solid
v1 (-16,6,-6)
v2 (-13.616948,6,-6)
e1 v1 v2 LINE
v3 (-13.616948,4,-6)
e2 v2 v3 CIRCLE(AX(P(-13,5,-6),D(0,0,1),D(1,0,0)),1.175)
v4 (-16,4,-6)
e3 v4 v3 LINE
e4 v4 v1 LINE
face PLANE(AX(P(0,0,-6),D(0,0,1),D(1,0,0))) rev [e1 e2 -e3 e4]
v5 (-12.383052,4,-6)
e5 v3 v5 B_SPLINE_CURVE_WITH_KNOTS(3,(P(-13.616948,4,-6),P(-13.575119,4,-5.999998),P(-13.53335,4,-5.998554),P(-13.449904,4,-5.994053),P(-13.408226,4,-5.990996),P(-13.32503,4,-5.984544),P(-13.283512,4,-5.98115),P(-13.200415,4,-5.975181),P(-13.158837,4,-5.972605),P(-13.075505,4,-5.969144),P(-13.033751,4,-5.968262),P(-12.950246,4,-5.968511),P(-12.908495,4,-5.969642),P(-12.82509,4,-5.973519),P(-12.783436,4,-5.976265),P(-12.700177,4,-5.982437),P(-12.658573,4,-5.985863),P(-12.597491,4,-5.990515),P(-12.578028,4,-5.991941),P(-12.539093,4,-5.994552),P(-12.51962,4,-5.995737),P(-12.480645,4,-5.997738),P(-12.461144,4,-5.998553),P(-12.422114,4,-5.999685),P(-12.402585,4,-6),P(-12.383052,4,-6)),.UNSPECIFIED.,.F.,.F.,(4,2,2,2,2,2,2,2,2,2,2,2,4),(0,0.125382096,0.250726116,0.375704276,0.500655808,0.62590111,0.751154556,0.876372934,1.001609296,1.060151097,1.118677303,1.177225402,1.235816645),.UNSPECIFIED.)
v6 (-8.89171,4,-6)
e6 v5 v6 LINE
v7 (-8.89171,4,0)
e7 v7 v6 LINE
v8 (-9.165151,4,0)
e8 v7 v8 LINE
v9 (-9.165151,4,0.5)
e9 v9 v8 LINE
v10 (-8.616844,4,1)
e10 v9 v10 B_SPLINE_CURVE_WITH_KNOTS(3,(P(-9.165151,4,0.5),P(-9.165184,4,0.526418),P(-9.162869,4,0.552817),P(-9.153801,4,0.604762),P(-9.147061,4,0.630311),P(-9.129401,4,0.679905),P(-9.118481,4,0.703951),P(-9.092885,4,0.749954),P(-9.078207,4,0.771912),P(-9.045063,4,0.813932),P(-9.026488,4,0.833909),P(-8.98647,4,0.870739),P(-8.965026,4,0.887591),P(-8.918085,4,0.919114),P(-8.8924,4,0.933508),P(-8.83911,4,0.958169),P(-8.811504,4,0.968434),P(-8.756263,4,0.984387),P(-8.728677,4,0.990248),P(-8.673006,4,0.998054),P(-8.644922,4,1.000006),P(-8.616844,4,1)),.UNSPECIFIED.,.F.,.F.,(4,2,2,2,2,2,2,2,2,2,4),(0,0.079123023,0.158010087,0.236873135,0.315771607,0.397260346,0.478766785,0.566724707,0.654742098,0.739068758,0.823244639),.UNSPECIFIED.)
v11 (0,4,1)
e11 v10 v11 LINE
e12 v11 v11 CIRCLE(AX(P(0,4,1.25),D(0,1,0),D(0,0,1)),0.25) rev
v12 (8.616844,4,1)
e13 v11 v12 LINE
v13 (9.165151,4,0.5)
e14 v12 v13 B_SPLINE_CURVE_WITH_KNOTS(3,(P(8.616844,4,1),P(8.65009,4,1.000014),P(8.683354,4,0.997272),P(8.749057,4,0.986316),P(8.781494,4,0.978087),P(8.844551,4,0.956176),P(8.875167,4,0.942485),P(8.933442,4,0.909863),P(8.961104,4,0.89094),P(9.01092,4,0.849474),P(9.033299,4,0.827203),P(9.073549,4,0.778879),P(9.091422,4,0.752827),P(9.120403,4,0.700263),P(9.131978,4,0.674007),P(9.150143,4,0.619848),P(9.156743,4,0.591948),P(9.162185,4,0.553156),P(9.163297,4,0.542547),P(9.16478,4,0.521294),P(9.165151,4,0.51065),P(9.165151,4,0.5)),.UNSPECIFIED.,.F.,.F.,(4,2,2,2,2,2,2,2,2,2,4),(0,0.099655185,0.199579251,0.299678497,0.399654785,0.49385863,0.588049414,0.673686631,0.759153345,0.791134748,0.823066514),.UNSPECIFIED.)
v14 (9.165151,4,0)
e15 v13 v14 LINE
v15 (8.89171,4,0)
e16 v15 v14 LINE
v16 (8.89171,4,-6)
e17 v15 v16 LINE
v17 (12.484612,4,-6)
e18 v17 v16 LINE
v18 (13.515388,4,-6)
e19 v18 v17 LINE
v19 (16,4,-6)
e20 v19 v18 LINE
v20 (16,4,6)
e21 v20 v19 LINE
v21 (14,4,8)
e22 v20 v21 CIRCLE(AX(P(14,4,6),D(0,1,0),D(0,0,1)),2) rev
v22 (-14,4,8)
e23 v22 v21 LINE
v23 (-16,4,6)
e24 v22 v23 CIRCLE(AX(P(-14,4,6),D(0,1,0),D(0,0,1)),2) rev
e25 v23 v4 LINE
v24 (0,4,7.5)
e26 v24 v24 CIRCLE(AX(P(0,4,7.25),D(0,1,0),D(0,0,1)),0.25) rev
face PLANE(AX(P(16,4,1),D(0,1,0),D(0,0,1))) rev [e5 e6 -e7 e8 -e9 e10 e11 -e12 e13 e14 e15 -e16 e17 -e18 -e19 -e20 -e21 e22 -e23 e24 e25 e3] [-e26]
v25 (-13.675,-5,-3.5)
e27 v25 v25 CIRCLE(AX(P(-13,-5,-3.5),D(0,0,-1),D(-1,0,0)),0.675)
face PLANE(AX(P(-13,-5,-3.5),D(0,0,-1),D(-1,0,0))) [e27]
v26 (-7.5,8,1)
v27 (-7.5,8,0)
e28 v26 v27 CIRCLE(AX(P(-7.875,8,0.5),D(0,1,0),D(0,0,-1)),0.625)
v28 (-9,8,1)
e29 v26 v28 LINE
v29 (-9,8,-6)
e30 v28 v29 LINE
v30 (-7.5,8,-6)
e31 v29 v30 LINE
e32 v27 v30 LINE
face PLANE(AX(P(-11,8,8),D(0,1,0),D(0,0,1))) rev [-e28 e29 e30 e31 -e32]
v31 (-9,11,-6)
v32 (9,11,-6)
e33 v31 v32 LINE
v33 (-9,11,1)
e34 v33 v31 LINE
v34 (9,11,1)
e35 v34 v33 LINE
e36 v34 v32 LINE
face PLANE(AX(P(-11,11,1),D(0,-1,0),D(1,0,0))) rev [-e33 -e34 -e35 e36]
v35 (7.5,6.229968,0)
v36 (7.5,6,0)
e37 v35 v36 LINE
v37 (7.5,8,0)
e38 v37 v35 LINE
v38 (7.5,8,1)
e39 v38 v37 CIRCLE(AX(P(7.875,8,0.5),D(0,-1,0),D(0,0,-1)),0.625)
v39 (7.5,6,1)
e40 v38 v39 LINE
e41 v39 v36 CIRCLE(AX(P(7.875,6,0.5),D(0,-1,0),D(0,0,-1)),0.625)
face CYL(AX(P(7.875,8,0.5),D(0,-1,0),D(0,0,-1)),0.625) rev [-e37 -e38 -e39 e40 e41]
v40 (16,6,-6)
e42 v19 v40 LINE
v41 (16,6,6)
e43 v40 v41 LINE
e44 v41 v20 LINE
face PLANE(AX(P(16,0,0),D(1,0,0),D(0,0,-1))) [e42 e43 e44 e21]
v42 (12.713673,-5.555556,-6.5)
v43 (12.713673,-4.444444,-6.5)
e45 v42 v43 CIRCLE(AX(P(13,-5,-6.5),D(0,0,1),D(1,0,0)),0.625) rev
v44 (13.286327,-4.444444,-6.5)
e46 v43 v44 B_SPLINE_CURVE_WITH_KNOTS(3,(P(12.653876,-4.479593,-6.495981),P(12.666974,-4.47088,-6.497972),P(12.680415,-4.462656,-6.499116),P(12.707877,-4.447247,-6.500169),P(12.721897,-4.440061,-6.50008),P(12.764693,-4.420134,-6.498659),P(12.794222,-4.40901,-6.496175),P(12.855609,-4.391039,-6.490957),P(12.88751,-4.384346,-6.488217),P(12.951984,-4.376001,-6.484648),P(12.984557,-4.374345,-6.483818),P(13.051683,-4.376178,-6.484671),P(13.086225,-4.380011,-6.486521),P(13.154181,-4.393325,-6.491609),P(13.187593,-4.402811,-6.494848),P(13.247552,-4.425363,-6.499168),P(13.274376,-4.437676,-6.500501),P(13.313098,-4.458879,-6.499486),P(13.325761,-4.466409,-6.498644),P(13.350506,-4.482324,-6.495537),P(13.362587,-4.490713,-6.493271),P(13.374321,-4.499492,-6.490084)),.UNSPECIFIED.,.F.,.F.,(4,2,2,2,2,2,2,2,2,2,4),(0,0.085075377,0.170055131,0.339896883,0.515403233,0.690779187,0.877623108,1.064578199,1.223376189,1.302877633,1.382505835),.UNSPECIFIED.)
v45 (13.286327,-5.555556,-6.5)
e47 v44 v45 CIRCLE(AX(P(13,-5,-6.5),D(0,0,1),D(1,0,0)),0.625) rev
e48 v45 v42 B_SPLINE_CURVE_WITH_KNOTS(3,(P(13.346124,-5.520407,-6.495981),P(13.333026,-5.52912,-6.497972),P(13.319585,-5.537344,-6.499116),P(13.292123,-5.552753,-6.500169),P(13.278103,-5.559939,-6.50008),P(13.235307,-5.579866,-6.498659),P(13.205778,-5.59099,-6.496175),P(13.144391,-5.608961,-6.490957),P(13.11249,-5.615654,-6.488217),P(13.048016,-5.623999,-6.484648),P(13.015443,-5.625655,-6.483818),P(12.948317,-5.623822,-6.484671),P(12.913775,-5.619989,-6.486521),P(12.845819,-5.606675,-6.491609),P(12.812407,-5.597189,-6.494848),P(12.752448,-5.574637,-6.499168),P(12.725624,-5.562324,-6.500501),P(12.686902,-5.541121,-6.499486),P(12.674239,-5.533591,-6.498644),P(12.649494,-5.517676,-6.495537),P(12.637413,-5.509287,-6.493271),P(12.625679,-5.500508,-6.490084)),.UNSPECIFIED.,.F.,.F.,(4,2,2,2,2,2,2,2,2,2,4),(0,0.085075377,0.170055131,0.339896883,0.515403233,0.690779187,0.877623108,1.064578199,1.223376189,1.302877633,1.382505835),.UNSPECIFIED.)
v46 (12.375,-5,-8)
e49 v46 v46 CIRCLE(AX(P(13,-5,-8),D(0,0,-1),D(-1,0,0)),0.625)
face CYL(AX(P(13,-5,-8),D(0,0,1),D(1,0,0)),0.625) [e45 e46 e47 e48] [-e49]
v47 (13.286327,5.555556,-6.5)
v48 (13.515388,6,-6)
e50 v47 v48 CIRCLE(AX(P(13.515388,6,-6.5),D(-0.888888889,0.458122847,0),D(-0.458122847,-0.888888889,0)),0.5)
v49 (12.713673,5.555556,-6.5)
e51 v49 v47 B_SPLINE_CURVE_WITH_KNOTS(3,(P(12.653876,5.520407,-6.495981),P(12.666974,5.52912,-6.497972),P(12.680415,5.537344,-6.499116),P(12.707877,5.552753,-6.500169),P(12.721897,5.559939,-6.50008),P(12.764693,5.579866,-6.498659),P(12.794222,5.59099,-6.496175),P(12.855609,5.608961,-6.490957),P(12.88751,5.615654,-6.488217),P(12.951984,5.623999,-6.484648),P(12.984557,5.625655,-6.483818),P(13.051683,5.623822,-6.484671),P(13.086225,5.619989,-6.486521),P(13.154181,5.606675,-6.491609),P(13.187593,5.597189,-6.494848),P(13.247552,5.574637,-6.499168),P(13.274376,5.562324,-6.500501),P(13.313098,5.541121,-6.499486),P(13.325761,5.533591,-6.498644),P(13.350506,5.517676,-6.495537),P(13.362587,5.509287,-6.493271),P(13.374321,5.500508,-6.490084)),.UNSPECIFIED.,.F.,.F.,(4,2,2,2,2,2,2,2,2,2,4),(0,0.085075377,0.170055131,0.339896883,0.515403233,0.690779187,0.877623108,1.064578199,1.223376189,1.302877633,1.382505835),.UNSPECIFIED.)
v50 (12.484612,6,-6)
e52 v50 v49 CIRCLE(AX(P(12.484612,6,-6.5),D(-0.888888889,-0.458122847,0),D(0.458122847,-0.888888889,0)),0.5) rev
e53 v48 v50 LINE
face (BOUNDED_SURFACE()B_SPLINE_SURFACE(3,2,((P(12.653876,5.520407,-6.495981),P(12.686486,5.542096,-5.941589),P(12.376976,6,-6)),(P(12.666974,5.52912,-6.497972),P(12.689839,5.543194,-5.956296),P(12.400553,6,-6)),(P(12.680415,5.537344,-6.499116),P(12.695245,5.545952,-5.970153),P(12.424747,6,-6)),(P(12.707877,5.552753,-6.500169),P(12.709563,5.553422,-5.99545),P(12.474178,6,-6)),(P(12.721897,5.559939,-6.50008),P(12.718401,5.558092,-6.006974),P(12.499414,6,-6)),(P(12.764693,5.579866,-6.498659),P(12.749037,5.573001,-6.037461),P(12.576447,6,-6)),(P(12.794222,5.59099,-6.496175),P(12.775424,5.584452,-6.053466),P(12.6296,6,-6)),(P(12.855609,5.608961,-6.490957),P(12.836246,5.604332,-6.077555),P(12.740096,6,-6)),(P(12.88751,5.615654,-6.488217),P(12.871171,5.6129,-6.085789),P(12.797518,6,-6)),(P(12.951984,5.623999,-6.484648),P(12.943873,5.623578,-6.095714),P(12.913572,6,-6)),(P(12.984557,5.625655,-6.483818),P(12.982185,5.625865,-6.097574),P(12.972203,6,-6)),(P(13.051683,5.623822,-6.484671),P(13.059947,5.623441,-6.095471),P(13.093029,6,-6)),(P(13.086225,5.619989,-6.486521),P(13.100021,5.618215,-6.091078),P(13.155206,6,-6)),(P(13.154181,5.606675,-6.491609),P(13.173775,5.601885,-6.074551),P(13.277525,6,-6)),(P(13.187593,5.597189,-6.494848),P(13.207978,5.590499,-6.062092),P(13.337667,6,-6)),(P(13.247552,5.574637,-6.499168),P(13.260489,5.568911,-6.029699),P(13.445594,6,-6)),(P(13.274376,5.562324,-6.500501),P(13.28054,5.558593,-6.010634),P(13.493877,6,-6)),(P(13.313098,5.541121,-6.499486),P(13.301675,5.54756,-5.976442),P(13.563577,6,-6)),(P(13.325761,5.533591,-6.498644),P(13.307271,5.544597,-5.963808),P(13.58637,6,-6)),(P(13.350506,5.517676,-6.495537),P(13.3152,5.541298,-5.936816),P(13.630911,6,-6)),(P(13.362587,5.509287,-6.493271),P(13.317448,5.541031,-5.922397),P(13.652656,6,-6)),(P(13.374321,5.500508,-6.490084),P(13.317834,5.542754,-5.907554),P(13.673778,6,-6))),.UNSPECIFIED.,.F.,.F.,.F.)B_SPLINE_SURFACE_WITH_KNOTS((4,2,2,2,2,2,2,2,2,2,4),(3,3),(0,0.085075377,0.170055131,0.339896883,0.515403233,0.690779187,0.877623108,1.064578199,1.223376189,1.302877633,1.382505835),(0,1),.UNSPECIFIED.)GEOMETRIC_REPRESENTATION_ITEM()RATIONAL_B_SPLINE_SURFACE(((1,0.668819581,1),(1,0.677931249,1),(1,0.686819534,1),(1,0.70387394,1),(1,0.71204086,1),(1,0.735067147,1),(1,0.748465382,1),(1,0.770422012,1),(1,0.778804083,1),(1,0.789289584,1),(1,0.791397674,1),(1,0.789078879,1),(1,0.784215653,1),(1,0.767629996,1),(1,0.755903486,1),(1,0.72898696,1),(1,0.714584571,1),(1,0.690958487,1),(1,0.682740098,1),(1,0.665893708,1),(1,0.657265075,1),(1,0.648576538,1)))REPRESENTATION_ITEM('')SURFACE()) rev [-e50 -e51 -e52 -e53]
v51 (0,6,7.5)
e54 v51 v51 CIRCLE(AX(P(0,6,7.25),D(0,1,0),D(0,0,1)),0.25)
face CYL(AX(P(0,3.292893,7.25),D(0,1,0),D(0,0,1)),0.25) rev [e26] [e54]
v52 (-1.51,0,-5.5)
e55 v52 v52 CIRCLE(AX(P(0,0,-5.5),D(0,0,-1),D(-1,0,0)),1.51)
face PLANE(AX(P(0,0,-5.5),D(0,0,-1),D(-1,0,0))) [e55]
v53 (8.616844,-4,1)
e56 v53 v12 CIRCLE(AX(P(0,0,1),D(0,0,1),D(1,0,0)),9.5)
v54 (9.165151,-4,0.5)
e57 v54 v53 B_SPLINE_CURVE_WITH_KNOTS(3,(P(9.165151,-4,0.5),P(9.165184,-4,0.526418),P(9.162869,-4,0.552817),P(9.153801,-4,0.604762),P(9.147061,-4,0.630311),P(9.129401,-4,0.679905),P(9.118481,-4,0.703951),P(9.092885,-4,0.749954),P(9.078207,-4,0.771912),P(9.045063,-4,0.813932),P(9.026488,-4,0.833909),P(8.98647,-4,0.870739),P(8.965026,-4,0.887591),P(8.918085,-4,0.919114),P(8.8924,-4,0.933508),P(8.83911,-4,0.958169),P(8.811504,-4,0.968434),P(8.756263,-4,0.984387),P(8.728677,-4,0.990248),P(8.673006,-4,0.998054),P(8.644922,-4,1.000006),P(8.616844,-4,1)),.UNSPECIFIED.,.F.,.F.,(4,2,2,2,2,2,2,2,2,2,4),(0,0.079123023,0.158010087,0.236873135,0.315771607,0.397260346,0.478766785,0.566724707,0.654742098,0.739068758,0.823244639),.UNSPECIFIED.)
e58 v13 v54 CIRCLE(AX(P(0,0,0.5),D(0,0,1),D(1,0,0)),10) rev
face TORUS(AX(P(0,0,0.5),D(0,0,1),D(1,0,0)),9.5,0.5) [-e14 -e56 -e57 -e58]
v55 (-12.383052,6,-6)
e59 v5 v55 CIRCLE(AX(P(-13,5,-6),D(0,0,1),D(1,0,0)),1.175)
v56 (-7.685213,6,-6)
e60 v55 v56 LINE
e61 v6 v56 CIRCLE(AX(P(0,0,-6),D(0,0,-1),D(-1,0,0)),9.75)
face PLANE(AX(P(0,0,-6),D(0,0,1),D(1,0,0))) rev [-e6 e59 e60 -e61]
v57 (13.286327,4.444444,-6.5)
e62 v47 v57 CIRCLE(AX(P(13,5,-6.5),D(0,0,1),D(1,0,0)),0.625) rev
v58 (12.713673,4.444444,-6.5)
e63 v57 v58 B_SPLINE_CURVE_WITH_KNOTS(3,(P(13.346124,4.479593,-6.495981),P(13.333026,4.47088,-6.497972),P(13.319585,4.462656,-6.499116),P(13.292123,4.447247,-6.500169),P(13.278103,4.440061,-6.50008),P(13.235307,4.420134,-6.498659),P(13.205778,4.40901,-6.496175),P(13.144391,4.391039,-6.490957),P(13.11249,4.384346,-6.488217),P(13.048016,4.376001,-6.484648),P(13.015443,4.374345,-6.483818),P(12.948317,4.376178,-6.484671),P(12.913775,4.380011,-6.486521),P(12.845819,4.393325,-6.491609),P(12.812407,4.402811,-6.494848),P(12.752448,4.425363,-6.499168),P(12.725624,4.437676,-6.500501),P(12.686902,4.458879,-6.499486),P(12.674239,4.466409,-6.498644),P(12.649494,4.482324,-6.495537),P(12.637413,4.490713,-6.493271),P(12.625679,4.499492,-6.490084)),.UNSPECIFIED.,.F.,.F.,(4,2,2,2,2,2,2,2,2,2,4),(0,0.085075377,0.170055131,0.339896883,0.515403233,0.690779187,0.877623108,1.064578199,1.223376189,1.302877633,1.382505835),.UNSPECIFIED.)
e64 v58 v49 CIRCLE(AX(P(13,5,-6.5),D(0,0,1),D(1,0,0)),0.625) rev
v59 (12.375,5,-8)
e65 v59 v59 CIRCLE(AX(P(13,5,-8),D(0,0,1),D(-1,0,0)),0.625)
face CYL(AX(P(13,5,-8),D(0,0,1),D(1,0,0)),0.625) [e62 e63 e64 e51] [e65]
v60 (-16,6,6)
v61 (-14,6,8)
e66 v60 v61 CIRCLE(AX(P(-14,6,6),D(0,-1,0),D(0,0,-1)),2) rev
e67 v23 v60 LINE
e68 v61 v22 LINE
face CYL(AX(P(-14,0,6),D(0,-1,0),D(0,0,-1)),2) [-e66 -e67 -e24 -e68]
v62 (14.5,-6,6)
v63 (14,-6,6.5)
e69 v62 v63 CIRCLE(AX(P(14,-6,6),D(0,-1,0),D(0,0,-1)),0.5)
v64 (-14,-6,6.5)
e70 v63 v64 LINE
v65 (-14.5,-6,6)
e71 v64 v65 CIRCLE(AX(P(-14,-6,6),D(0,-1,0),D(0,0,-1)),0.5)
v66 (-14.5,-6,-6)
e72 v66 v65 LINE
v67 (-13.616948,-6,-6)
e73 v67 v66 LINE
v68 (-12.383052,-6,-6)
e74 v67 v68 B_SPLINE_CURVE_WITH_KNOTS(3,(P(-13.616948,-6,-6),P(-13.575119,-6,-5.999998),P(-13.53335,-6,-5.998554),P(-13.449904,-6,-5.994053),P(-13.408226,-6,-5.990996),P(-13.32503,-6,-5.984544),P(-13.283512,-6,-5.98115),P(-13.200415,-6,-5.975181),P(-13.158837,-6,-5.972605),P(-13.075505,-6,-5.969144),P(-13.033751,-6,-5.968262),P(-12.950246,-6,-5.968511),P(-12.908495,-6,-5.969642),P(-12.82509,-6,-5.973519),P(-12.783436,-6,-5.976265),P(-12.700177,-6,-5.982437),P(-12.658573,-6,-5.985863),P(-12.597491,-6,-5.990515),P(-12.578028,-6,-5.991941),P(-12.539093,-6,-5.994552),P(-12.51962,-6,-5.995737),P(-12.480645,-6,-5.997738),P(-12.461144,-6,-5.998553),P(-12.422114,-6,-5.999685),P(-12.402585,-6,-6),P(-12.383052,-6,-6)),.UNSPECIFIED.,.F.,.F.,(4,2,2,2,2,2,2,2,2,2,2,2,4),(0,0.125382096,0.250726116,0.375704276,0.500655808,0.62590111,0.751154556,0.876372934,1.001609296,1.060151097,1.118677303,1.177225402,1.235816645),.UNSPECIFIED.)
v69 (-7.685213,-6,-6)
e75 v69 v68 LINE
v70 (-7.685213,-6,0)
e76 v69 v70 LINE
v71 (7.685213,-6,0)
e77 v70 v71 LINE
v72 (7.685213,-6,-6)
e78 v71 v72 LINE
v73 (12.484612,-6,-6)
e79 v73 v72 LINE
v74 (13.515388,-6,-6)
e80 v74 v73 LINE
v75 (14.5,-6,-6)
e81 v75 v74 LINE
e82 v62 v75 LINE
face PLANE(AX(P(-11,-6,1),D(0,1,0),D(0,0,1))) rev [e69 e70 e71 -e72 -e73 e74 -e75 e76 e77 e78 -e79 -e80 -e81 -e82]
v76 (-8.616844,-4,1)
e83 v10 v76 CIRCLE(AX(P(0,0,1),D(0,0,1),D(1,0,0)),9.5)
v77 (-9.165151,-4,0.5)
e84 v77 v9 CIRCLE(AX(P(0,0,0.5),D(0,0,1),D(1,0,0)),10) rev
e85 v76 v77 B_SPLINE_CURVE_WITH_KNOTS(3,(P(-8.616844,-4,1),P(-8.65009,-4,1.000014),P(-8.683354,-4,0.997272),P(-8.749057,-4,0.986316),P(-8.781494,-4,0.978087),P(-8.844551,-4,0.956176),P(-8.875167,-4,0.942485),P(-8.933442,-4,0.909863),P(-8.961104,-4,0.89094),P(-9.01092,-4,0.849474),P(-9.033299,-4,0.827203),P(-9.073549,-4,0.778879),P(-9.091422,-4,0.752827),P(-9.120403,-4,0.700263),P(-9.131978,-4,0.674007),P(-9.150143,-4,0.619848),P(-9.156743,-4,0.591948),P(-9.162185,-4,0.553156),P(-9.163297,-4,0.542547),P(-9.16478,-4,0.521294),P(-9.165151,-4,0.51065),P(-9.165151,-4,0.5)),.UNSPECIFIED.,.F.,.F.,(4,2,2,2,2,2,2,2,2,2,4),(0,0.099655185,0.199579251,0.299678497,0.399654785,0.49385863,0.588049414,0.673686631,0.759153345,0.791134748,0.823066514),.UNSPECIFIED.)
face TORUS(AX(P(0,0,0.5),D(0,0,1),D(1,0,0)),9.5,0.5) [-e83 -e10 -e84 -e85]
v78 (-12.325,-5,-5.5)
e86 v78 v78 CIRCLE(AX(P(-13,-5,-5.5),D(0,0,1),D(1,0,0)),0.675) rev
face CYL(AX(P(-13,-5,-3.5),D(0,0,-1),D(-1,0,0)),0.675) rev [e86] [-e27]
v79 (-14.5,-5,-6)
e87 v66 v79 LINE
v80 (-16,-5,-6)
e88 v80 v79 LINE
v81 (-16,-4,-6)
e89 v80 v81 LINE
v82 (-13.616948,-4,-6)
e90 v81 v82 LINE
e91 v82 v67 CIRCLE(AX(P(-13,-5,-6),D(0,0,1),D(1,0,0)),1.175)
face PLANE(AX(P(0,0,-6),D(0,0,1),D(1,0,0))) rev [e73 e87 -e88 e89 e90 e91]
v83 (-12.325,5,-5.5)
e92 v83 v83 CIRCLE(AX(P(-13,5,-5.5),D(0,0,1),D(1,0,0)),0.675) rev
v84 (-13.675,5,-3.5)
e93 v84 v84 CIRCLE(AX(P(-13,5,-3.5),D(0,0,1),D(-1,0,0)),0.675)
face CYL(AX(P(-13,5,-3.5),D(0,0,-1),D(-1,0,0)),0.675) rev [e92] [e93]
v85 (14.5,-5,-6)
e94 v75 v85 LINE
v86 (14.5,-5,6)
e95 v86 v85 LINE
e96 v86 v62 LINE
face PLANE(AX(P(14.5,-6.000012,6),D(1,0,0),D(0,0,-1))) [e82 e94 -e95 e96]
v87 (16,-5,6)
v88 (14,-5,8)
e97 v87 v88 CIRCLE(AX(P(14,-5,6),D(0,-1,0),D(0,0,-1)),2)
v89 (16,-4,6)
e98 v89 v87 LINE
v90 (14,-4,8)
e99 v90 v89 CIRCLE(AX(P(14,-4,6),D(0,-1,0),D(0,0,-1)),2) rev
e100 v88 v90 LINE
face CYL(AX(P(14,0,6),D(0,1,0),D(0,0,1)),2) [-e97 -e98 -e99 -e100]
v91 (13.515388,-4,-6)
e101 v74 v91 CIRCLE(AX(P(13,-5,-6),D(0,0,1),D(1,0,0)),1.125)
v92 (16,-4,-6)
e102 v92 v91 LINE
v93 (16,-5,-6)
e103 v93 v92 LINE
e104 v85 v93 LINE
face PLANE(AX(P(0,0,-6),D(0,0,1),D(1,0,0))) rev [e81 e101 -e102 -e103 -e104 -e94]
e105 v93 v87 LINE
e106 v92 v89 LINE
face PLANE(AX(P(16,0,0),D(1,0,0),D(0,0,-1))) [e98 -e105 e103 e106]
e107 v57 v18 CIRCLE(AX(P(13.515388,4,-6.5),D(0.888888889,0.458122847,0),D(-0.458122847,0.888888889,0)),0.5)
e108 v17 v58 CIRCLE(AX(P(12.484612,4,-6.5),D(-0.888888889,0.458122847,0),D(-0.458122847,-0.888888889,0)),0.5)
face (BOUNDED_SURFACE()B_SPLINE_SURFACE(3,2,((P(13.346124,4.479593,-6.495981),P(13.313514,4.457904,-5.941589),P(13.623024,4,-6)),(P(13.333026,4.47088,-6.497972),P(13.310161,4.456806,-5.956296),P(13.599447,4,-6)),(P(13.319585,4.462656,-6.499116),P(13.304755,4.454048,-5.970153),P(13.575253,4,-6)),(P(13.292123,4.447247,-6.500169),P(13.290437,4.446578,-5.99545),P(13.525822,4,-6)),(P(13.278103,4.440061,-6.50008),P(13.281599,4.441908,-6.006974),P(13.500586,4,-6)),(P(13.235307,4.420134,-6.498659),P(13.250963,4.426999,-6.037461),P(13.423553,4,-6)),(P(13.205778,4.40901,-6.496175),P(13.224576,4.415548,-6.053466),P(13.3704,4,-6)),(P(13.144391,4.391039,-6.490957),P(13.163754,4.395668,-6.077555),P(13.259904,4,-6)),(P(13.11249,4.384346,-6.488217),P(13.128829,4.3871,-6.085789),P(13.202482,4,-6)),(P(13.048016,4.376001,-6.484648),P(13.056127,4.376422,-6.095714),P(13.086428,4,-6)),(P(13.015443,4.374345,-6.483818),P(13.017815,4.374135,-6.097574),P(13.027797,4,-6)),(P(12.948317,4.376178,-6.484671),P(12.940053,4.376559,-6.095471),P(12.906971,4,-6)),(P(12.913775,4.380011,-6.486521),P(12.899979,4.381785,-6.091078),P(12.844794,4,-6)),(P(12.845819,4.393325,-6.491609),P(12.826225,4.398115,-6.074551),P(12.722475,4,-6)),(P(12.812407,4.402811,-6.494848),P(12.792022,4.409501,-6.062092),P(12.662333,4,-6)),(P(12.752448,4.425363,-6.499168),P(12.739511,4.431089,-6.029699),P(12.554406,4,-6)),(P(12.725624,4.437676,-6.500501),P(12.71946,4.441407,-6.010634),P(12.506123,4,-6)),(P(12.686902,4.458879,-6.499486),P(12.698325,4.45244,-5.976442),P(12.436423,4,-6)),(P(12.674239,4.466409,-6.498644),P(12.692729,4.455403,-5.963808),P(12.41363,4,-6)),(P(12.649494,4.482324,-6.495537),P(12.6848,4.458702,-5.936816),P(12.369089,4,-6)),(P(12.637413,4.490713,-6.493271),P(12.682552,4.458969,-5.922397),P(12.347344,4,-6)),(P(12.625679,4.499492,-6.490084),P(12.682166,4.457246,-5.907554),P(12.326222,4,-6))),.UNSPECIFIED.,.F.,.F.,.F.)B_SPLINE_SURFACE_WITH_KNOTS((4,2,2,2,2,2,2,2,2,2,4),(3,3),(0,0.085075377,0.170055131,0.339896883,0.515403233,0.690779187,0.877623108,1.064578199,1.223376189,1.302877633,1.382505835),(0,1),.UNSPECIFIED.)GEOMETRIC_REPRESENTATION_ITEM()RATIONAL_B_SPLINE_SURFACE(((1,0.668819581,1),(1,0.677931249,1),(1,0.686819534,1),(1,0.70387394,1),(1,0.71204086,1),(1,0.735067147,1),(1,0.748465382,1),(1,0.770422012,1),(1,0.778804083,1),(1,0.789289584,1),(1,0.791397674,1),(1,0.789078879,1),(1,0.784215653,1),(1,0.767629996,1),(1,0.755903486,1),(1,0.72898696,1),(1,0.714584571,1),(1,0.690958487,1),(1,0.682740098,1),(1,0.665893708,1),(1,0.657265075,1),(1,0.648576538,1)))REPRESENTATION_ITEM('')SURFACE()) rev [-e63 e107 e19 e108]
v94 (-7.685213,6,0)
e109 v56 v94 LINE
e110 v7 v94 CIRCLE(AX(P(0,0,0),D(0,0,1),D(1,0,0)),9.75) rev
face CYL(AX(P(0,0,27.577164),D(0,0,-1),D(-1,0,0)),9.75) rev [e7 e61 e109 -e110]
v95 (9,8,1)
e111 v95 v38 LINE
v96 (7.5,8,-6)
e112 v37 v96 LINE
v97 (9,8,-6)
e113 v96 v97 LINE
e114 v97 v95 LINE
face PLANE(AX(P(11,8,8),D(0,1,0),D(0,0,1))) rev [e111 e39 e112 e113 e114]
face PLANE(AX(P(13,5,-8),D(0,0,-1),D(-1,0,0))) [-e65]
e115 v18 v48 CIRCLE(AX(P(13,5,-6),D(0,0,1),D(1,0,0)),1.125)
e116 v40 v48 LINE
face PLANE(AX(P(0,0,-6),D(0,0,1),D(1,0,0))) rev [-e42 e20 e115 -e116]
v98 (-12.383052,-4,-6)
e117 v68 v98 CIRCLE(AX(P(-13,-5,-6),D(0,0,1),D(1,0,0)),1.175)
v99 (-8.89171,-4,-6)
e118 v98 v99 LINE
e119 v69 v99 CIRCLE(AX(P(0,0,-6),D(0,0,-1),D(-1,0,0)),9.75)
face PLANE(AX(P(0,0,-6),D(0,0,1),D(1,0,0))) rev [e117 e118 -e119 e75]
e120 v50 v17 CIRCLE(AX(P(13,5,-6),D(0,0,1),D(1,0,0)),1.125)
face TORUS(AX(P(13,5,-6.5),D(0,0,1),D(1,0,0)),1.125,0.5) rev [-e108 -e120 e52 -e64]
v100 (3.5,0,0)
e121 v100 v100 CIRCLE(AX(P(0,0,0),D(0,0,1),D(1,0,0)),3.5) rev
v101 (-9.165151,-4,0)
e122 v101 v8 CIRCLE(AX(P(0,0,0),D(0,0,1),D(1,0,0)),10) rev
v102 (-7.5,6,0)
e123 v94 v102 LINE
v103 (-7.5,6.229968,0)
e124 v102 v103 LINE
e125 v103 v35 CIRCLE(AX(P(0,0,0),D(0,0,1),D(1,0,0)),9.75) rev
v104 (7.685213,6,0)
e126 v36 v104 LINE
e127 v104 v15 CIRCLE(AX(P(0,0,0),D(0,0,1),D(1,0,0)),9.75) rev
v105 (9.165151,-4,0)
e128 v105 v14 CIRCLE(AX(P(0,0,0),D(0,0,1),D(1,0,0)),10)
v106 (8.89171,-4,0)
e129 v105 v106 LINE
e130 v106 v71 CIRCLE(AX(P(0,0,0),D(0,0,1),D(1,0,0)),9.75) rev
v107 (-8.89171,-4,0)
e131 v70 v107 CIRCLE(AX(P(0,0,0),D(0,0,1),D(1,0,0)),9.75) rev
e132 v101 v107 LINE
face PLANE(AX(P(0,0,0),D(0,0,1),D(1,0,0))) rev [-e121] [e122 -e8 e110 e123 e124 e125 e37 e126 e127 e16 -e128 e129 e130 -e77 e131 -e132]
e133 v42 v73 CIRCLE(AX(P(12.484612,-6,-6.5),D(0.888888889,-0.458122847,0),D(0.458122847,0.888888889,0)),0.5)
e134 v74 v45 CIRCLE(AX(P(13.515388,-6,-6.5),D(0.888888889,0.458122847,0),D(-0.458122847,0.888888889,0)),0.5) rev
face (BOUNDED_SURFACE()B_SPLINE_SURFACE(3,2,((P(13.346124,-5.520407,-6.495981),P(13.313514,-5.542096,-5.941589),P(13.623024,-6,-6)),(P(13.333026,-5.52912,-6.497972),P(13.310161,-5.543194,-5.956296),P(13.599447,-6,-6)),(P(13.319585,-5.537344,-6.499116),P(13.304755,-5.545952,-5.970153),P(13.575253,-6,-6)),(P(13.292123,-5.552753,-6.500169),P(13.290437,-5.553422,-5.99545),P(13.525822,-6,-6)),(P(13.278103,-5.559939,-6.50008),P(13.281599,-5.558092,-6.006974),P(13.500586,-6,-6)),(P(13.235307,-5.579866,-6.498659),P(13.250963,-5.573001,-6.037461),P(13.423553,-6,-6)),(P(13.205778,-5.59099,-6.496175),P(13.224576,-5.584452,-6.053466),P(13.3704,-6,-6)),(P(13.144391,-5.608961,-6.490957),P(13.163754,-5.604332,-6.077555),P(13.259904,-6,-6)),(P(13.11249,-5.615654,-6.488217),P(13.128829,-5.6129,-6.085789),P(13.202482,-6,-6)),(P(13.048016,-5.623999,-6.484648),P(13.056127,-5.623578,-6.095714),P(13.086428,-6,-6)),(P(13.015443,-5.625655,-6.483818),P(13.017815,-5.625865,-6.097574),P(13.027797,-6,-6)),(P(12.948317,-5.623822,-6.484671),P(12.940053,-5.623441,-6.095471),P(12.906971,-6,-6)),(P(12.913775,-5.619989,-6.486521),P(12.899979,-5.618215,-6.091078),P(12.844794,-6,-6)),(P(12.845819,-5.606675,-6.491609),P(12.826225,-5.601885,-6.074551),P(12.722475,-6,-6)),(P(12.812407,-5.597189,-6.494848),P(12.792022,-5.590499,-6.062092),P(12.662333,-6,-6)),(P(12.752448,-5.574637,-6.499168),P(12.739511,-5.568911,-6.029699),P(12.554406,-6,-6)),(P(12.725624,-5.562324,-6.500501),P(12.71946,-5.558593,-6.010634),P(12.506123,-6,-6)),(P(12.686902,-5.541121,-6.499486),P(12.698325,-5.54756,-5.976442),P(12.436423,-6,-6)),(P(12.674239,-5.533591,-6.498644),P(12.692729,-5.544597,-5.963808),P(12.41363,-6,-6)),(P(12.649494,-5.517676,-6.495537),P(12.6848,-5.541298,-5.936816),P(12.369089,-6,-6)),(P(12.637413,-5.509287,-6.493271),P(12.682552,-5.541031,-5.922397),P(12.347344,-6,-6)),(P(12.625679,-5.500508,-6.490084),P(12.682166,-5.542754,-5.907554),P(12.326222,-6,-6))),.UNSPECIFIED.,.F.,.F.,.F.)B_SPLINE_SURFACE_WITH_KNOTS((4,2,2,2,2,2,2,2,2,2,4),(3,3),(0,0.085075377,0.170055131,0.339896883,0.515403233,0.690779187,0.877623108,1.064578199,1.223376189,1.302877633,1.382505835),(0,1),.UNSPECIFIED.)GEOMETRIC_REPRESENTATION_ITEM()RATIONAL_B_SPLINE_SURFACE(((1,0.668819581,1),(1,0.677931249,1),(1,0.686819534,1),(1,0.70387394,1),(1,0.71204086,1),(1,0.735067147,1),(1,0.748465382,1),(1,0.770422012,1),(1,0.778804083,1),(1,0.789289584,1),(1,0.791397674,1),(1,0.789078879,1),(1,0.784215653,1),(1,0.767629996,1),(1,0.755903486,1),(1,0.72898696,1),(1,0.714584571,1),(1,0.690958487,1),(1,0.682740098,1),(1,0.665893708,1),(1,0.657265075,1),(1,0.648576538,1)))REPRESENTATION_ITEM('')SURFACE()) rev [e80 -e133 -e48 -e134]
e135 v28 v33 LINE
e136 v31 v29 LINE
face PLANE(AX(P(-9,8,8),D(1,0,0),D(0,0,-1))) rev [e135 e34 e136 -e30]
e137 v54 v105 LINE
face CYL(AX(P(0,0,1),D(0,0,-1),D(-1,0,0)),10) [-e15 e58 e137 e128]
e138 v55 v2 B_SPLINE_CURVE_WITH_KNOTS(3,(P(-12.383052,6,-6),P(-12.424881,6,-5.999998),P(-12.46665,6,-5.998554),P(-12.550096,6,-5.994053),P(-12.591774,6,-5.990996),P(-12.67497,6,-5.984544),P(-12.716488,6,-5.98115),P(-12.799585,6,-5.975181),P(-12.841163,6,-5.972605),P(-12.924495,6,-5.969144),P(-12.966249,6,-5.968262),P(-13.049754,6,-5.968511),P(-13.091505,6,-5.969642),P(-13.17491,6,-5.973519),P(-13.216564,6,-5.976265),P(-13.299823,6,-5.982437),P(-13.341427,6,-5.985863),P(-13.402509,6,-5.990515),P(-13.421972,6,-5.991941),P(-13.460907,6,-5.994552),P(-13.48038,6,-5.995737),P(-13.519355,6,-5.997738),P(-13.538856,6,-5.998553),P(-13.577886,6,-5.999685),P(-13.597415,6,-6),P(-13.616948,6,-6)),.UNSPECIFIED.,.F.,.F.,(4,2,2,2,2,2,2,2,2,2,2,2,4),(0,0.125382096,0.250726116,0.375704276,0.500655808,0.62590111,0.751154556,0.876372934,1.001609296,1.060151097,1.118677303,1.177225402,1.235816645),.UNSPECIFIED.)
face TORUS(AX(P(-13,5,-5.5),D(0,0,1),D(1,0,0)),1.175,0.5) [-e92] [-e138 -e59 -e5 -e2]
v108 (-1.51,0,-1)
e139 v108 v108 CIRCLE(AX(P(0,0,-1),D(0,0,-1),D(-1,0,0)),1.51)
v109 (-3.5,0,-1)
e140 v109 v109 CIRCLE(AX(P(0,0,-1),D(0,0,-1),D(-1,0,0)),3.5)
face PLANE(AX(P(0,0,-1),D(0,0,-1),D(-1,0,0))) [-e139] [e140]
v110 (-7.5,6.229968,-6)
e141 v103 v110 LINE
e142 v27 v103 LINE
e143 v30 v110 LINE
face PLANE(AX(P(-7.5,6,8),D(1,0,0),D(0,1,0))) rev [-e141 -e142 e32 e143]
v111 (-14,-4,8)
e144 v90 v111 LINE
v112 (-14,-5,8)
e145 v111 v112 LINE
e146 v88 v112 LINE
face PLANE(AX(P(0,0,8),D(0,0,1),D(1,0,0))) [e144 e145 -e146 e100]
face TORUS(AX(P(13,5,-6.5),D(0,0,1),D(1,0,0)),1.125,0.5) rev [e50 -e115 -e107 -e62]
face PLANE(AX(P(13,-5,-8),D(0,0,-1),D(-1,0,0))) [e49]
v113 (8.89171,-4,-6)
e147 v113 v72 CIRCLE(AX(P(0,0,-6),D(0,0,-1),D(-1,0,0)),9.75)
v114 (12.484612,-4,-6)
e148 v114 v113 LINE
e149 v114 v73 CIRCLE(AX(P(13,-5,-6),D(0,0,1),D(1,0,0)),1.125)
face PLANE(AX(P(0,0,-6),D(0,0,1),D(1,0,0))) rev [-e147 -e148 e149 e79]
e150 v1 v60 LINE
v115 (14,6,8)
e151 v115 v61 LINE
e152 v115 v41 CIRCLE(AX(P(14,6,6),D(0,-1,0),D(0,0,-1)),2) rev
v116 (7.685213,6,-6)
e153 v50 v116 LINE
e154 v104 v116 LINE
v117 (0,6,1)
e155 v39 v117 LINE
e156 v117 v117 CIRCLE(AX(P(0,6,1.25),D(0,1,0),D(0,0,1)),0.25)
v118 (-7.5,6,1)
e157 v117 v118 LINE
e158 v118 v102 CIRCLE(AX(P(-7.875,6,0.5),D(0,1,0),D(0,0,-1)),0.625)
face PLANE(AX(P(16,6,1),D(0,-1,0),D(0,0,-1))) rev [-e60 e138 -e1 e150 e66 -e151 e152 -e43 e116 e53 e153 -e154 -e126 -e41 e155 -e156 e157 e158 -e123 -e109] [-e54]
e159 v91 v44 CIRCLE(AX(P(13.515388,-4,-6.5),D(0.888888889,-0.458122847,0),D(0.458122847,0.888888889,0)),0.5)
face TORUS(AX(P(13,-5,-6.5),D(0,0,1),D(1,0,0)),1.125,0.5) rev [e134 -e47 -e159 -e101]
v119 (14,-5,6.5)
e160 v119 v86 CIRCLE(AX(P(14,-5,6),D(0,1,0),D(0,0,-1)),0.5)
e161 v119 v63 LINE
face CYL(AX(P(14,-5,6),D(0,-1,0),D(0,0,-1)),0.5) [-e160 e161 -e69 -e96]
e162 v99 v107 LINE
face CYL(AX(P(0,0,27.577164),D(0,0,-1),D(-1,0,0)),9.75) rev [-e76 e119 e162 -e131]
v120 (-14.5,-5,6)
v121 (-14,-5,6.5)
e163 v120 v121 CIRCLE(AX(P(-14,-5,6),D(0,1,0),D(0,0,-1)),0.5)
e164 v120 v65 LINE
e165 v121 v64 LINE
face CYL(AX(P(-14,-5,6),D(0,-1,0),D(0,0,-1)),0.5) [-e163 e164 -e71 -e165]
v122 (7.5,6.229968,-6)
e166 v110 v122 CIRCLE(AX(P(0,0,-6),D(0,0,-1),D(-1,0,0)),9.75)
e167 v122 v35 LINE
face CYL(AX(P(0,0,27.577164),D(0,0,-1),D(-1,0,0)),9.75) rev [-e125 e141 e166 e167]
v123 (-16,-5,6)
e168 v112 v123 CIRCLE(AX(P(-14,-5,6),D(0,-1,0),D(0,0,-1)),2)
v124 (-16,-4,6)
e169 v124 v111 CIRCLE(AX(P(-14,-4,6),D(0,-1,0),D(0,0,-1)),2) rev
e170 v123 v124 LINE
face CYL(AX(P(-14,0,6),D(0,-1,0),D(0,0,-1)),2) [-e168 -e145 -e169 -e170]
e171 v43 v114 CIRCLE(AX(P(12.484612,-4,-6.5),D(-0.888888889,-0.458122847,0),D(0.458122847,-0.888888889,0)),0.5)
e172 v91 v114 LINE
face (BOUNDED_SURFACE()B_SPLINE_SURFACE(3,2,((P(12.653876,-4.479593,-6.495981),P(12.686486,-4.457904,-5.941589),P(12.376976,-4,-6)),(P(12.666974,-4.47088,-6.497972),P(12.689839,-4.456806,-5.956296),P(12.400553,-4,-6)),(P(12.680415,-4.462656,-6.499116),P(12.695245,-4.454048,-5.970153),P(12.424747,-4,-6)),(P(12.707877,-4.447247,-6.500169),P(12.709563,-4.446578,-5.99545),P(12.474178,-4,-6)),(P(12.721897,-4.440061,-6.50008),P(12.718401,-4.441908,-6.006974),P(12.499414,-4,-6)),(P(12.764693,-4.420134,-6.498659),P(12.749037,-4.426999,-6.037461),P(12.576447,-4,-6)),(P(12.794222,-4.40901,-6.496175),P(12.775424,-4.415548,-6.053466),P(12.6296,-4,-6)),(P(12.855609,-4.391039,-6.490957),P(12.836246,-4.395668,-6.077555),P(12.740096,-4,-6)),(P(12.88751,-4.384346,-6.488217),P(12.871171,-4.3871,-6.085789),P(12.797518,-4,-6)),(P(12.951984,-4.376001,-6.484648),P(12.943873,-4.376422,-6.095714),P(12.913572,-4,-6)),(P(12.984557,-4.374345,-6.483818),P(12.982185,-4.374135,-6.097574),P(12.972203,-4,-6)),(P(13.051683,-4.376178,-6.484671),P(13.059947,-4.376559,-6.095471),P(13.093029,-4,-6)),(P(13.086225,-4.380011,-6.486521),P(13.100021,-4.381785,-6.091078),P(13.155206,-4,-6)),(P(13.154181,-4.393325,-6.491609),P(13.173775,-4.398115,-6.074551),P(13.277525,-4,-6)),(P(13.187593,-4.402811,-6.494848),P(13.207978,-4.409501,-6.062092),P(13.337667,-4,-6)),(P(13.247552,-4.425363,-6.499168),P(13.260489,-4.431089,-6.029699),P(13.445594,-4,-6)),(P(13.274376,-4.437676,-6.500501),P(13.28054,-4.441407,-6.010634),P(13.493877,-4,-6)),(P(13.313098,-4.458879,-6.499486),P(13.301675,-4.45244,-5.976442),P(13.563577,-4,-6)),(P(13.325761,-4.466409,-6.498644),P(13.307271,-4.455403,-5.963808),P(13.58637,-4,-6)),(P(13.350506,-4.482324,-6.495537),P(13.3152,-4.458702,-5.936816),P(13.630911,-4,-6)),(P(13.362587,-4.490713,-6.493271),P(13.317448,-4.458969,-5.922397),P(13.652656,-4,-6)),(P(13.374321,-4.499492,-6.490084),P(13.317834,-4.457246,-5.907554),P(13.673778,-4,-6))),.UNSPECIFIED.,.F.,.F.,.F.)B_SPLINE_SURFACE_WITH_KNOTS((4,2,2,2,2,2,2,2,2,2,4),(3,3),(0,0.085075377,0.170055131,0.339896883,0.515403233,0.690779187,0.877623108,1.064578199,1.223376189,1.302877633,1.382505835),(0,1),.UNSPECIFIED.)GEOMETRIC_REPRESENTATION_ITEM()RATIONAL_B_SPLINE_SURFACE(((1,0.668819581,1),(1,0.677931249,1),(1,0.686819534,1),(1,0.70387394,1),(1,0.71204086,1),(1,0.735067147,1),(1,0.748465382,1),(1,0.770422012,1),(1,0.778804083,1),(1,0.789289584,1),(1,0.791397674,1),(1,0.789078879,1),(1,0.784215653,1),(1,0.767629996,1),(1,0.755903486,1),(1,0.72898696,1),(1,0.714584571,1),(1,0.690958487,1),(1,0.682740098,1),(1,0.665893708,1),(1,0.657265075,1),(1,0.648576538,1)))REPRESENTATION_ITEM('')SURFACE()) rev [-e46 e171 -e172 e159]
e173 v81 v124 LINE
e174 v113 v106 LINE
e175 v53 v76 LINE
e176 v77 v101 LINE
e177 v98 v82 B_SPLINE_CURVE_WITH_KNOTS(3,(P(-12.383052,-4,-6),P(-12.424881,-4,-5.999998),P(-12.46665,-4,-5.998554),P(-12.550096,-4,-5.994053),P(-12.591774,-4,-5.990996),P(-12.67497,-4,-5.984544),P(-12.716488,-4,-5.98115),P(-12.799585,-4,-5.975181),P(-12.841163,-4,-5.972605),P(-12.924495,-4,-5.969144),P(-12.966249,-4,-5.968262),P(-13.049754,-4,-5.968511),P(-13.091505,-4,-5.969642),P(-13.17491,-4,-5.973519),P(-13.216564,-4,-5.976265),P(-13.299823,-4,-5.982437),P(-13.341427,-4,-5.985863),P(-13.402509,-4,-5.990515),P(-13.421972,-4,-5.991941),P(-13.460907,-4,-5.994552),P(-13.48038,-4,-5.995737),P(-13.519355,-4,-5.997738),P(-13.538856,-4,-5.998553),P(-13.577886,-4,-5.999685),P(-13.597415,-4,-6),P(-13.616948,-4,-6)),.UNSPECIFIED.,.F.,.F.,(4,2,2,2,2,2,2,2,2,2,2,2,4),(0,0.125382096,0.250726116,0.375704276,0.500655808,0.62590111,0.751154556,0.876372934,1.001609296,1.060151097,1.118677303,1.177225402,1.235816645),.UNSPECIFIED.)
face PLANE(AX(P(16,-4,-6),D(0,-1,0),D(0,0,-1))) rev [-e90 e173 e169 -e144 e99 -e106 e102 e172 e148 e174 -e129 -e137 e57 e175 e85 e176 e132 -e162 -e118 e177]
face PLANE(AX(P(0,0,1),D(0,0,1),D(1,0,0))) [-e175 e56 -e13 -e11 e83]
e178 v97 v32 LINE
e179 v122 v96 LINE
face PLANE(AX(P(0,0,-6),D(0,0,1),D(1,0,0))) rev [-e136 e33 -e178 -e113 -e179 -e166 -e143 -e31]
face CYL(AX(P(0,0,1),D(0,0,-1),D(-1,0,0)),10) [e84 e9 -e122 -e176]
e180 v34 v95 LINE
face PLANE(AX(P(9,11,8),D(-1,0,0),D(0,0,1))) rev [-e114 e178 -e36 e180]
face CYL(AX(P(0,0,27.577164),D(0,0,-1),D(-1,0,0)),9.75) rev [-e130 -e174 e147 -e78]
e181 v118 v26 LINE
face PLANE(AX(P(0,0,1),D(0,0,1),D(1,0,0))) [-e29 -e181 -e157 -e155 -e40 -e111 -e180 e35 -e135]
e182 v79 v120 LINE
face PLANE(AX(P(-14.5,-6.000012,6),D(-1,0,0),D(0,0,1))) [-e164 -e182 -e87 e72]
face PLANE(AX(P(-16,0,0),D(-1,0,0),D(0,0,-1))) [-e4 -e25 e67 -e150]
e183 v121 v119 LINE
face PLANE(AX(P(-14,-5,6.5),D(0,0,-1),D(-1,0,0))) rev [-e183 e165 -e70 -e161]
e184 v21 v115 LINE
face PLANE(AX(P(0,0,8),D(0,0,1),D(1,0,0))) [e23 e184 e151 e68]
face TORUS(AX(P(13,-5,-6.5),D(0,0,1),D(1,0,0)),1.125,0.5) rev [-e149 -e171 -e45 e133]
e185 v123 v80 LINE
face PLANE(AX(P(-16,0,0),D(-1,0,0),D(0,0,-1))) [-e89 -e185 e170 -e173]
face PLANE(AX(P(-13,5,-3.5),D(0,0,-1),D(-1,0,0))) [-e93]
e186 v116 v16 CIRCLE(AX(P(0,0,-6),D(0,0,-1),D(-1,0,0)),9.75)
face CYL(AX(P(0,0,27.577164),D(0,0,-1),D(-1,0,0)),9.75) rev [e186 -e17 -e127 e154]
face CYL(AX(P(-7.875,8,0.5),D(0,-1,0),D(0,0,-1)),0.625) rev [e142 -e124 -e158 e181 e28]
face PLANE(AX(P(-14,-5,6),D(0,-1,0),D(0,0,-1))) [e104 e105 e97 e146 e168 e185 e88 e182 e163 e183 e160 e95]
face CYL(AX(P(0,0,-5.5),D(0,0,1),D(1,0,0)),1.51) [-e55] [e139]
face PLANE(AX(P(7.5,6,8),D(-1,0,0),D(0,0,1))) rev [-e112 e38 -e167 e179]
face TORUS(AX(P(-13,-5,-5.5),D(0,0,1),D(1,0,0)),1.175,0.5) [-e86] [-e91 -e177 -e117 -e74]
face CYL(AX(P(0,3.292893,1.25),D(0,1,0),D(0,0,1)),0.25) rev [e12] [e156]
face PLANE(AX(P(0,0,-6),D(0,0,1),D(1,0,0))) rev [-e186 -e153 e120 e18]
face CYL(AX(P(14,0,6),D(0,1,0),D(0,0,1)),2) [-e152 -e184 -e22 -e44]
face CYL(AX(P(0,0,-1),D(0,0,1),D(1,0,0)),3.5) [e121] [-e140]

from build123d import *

# Parameters (mm, degrees)
BOSS_EXTRUDE1_DEPTH     = 1
SKETCH2_R               = 1.51
BOSS_EXTRUDE2_DEPTH     = 5.5
SKETCH3_R               = 3.5
BOSS_EXTRUDE3_DEPTH     = 1
SKETCH4_W               = 2
SKETCH4_H               = 17
BOSS_EXTRUDE4_DEPTH     = 6
SKETCH5_W               = 18
SKETCH5_H               = 2
BOSS_EXTRUDE5_DEPTH     = 6
SKETCH6_W               = 7
SKETCH6_H               = 2
BOSS_EXTRUDE6_DEPTH     = 5
BOSS_EXTRUDE7_DEPTH     = 6
CUT_EXTRUDE1_DEPTH      = 21.639767441
SKETCH9_W               = 2.937742252
SKETCH9_H               = 8
CUT_EXTRUDE2_DEPTH      = 6
CUT_EXTRUDE11_START     = -6
SKETCH21_R              = 9.75
SKETCH21_R_2            = 3.5
CUT_EXTRUDE11_DEPTH     = 6
SKETCH10_W              = 32
SKETCH10_H              = 2
BOSS_EXTRUDE8_DEPTH     = 7
FILLET1_R               = 0.5
SKETCH11_R              = 0.625
BOSS_EXTRUDE9_DEPTH     = 2
SKETCH14_W              = 3.5
SKETCH14_H              = 2
CUT_EXTRUDE5_DEPTH      = 24.937418532
SKETCH12_R              = 0.675
CUT_EXTRUDE3_DEPTH      = 2.5
CUT_EXTRUDE6_DEPTH      = 2
FILLET2_R               = 0.5
FILLET3_R               = 0.5
FILLET4_R               = 2
CUT_EXTRUDE7_DEPTH      = 25.677925456
CUT_EXTRUDE7_DEPTH_BACK = 1
SKETCH19_R              = 0.25
CUT_EXTRUDE9_DEPTH      = 2
SKETCH20_W              = 2
SKETCH20_H              = 3
CUT_EXTRUDE10_DEPTH     = 24.937418532


with BuildPart() as part:
    # Sketch1 → Boss-Extrude1 (new body)
    with BuildSketch(Plane.XY):
        Polygon((-11, 6), (-11, 11), (11, 11), (11, 6), (11, -6), (-11, -6), align=None)
    extrude(amount=BOSS_EXTRUDE1_DEPTH)

    # Sketch2 → Boss-Extrude2 (add)
    with BuildSketch(Plane(origin=(0, 0, 0), x_dir=(-1, 0, 0), z_dir=(0, 0, -1))):
        with Locations(Location((0, 0, 0), (0, 0, 180))):
            Circle(SKETCH2_R)
    extrude(amount=BOSS_EXTRUDE2_DEPTH)

    # Sketch3 → Boss-Extrude3 (add)
    with BuildSketch(Plane(origin=(0, 0, 0), x_dir=(-1, 0, 0), z_dir=(0, 0, -1))):
        with Locations(Location((0, 0, 0), (0, 0, 180))):
            Circle(SKETCH3_R)
    extrude(amount=BOSS_EXTRUDE3_DEPTH)

    # Sketch4 → Boss-Extrude4 (add)
    with BuildSketch(Plane(origin=(0, 0, 0), x_dir=(-1, 0, 0), z_dir=(0, 0, -1))):
        with Locations((10, 2.5)):
            Rectangle(SKETCH4_W, SKETCH4_H)
        with Locations((-10, 2.5)):
            Rectangle(SKETCH4_W, SKETCH4_H)
    extrude(amount=BOSS_EXTRUDE4_DEPTH)

    # Sketch5 → Boss-Extrude5 (add)
    with BuildSketch(Plane(origin=(0, 0, 0), x_dir=(-1, 0, 0), z_dir=(0, 0, -1))):
        with Locations((0, 10)):
            Rectangle(SKETCH5_W, SKETCH5_H)
    extrude(amount=BOSS_EXTRUDE5_DEPTH)

    # Sketch6 → Boss-Extrude6 (add)
    with BuildSketch(Plane(origin=(11, 0, 0), x_dir=(0, 0, -1), z_dir=(1, 0, 0))):
        with Locations((2.5, -5)):
            Rectangle(SKETCH6_W, SKETCH6_H)
        with Locations((2.5, 5)):
            Rectangle(SKETCH6_W, SKETCH6_H)
    boss_extrude6 = extrude(amount=BOSS_EXTRUDE6_DEPTH)

    # Mirror1: Boss-Extrude6 across plane
    add(boss_extrude6.mirror(Plane(origin=(0, 0, 0), x_dir=(0, 0, 1), z_dir=(1, 0, 0))))

    # Sketch7 → Boss-Extrude7 (add)
    with BuildSketch(Plane(origin=(0, 0, -6), x_dir=(-1, 0, 0), z_dir=(0, 0, -1))):
        with BuildLine():
            ThreePointArc((-6.708203932, -6), (-8.407551231, -3.211398808), (-9, 0))
            Line((-9, 0), (-9, -6))
            Line((-9, -6), (-6.708203932, -6))
        make_face()
        with BuildLine():
            Line((-9, 9), (-9, 0))
            ThreePointArc((-9, 0), (-6.363961031, 6.363961031), (0, 9))
            Line((0, 9), (-9, 9))
        make_face()
    boss_extrude7 = extrude(amount=-BOSS_EXTRUDE7_DEPTH)

    # Sketch8 → Cut-Extrude1 (cut, through all)
    with BuildSketch(Plane(origin=(0, 0, -6), x_dir=(-1, 0, 0), z_dir=(0, 0, -1))):
        with BuildLine():
            Line((-11, 4), (-9.16515139, 4))
            ThreePointArc((-9.16515139, 4), (-10, 0), (-9.16515139, -4))
            Line((-9.16515139, -4), (-11, -4))
            Line((-11, -4), (-11, 4))
        make_face()
    cut_extrude1 = extrude(amount=-CUT_EXTRUDE1_DEPTH, mode=Mode.SUBTRACT)

    # Sketch9 → Cut-Extrude2 (cut)
    with BuildSketch(Plane(origin=(0, 0, -6), x_dir=(-1, 0, 0), z_dir=(0, 0, -1))):
        with Locations((-9.531128874, 0)):
            Rectangle(SKETCH9_W, SKETCH9_H)
    cut_extrude2 = extrude(amount=-CUT_EXTRUDE2_DEPTH, mode=Mode.SUBTRACT)

    # Mirror2: Boss-Extrude7, Cut-Extrude1, Cut-Extrude2 across plane
    add(boss_extrude7.mirror(Plane(origin=(0, 0, 0), x_dir=(0, 0, 1), z_dir=(1, 0, 0))))
    add(cut_extrude1.mirror(Plane(origin=(0, 0, 0), x_dir=(0, 0, 1), z_dir=(1, 0, 0))), mode=Mode.SUBTRACT)
    add(cut_extrude2.mirror(Plane(origin=(0, 0, 0), x_dir=(0, 0, 1), z_dir=(1, 0, 0))), mode=Mode.SUBTRACT)

    # Sketch21 → Cut-Extrude11 (cut)
    with BuildSketch(Plane(origin=(0, 0, -6), x_dir=(-1, 0, 0), z_dir=(0, 0, -1)).offset(CUT_EXTRUDE11_START)):
        Circle(SKETCH21_R)
        with Locations(Location((0, 0, 0), (0, 0, 180))):
            Circle(SKETCH21_R_2, mode=Mode.SUBTRACT)
    extrude(amount=CUT_EXTRUDE11_DEPTH, mode=Mode.SUBTRACT)

    # Sketch10 → Boss-Extrude8 (add)
    with BuildSketch(Plane.XY.offset(1)):
        with Locations((0, -5)):
            Rectangle(SKETCH10_W, SKETCH10_H)
        with Locations((0, 5)):
            Rectangle(SKETCH10_W, SKETCH10_H)
    extrude(amount=BOSS_EXTRUDE8_DEPTH)

    # Fillet1
    fillet1_edges = [part.edges().sort_by_distance(p)[0] for p in [
        (10, 0, 1),
        (-10, 0, 1),
    ]]
    fillet(fillet1_edges, radius=FILLET1_R)

    # Sketch11 → Boss-Extrude9 (add)
    with BuildSketch(Plane(origin=(0, 0, -6), x_dir=(-1, 0, 0), z_dir=(0, 0, -1))):
        with Locations(Location((-13, -5, 0), (0, 0, 180))):
            Circle(SKETCH11_R)
    boss_extrude9 = extrude(amount=BOSS_EXTRUDE9_DEPTH)

    # Sketch14 → Cut-Extrude5 (cut, through all)
    with BuildSketch(Plane(origin=(0, 0, -6), x_dir=(-1, 0, 0), z_dir=(0, 0, -1))):
        with Locations((9.25, 7)):
            Rectangle(SKETCH14_W, SKETCH14_H)
        with Locations((-9.25, 7)):
            Rectangle(SKETCH14_W, SKETCH14_H)
    extrude(amount=-CUT_EXTRUDE5_DEPTH, mode=Mode.SUBTRACT)

    # Sketch12 → Cut-Extrude3 (cut)
    with BuildSketch(Plane(origin=(0, 0, -6), x_dir=(-1, 0, 0), z_dir=(0, 0, -1))):
        with Locations((13, -5)):
            Circle(SKETCH12_R)
    cut_extrude3 = extrude(amount=-CUT_EXTRUDE3_DEPTH, mode=Mode.SUBTRACT)

    # Sketch16 → Cut-Extrude6 (cut)
    with BuildSketch(Plane(origin=(0, 6, 0), x_dir=(1, 0, 0), z_dir=(0, 1, 0))):
        with BuildLine():
            Line((-7.5, 0), (-7.5, -1))
            ThreePointArc((-7.5, -1), (-7.25, -0.5), (-7.5, 0))
        make_face()
    cut_extrude6 = extrude(amount=CUT_EXTRUDE6_DEPTH, mode=Mode.SUBTRACT)

    # Mirror3: Boss-Extrude9, Cut-Extrude3 across plane
    add(boss_extrude9.mirror(Plane.ZX))
    add(cut_extrude3.mirror(Plane.ZX), mode=Mode.SUBTRACT)

    # Mirror4: Cut-Extrude6 across plane
    add(cut_extrude6.mirror(Plane(origin=(0, 0, 0), x_dir=(0, 0, 1), z_dir=(1, 0, 0))), mode=Mode.SUBTRACT)

    # Fillet2
    fillet2_edges = [part.edges().sort_by_distance(p)[0] for p in [
        (12.375, -5, -6),
        (12.375, 5, -6),
    ]]
    fillet(fillet2_edges, radius=FILLET2_R)

    # Fillet3
    # the kernel refuses this fillet: 0.5 mm, written as the material it takes off along each edge
    with BuildSketch(Plane(origin=(-13, -5, -6), x_dir=(-1, 0, 0), z_dir=(0, -1, 0))) as fillet3_piece_1:
        with BuildLine():
            CenterArc((0.675 + FILLET3_R, -FILLET3_R), FILLET3_R, 90, 90)
            Line((0.675, -FILLET3_R), (0.675, 0))
            Line((0.675, 0), (0.675 + FILLET3_R, 0))
        make_face()
    revolve(axis=Axis((-13, -5, -6), (0, 0, -1)), mode=Mode.SUBTRACT)
    with BuildSketch(Plane(origin=(-13, 5, -6), x_dir=(-1, 0, 0), z_dir=(0, 1, 0))) as fillet3_piece_2:
        with BuildLine():
            CenterArc((0.675 + FILLET3_R, FILLET3_R), FILLET3_R, 180, 90)
            Line((0.675, FILLET3_R), (0.675, 0))
            Line((0.675, 0), (0.675 + FILLET3_R, 0))
        make_face()
    revolve(axis=Axis((-13, 5, -6), (0, 0, 1)), mode=Mode.SUBTRACT)

    # Fillet4
    fillet4_edges = [part.edges().sort_by_distance(p)[0] for p in [
        (16, -5, 8),
        (-16, -5, 8),
        (-16, 5, 8),
        (16, 5, 8),
    ]]
    fillet(fillet4_edges, radius=FILLET4_R)

    # Sketch17 → Cut-Extrude7 (cut, two sides: drawn at the far end of the back side and taken through both)
    with BuildSketch(Plane.XZ.offset(6).offset(-CUT_EXTRUDE7_DEPTH_BACK)):
        with BuildLine():
            Line((-16, 6), (-16, -6))
            Line((-16, -6), (-14.5, -6))
            Line((-14.5, -6), (-14.5, 6))
            ThreePointArc((-14.5, 6), (-14.353553391, 6.353553391), (-14, 6.5))
            Line((-14, 6.5), (14, 6.5))
            ThreePointArc((14, 6.5), (14.353553391, 6.353553391), (14.5, 6))
            Line((14.5, 6), (14.5, -6))
            Line((14.5, -6), (16, -6))
            Line((16, -6), (16, 6))
            ThreePointArc((16, 6), (15.414213562, 7.414213562), (14, 8))
            Line((14, 8), (-14, 8))
            ThreePointArc((-14, 8), (-15.414213562, 7.414213562), (-16, 6))
        make_face()
    extrude(amount=CUT_EXTRUDE7_DEPTH + CUT_EXTRUDE7_DEPTH_BACK, mode=Mode.SUBTRACT)

    # Sketch19 → Cut-Extrude9 (cut)
    with BuildSketch(Plane(origin=(0, 6, 0), x_dir=(1, 0, 0), z_dir=(0, 1, 0))):
        with Locations(Location((0, -1.25, 0), (0, 0, 90))):
            Circle(SKETCH19_R)
        with Locations(Location((0, -7.25, 0), (0, 0, 270))):
            Circle(SKETCH19_R)
    extrude(amount=-CUT_EXTRUDE9_DEPTH, mode=Mode.SUBTRACT)

    # Sketch20 → Cut-Extrude10 (cut, through all)
    with BuildSketch(Plane(origin=(0, 0, -6), x_dir=(-1, 0, 0), z_dir=(0, 0, -1))):
        with Locations((-10, 9.5)):
            Rectangle(SKETCH20_W, SKETCH20_H)
        with Locations((10, 9.5)):
            Rectangle(SKETCH20_W, SKETCH20_H)
    extrude(amount=-CUT_EXTRUDE10_DEPTH, mode=Mode.SUBTRACT)


solid = part.part
